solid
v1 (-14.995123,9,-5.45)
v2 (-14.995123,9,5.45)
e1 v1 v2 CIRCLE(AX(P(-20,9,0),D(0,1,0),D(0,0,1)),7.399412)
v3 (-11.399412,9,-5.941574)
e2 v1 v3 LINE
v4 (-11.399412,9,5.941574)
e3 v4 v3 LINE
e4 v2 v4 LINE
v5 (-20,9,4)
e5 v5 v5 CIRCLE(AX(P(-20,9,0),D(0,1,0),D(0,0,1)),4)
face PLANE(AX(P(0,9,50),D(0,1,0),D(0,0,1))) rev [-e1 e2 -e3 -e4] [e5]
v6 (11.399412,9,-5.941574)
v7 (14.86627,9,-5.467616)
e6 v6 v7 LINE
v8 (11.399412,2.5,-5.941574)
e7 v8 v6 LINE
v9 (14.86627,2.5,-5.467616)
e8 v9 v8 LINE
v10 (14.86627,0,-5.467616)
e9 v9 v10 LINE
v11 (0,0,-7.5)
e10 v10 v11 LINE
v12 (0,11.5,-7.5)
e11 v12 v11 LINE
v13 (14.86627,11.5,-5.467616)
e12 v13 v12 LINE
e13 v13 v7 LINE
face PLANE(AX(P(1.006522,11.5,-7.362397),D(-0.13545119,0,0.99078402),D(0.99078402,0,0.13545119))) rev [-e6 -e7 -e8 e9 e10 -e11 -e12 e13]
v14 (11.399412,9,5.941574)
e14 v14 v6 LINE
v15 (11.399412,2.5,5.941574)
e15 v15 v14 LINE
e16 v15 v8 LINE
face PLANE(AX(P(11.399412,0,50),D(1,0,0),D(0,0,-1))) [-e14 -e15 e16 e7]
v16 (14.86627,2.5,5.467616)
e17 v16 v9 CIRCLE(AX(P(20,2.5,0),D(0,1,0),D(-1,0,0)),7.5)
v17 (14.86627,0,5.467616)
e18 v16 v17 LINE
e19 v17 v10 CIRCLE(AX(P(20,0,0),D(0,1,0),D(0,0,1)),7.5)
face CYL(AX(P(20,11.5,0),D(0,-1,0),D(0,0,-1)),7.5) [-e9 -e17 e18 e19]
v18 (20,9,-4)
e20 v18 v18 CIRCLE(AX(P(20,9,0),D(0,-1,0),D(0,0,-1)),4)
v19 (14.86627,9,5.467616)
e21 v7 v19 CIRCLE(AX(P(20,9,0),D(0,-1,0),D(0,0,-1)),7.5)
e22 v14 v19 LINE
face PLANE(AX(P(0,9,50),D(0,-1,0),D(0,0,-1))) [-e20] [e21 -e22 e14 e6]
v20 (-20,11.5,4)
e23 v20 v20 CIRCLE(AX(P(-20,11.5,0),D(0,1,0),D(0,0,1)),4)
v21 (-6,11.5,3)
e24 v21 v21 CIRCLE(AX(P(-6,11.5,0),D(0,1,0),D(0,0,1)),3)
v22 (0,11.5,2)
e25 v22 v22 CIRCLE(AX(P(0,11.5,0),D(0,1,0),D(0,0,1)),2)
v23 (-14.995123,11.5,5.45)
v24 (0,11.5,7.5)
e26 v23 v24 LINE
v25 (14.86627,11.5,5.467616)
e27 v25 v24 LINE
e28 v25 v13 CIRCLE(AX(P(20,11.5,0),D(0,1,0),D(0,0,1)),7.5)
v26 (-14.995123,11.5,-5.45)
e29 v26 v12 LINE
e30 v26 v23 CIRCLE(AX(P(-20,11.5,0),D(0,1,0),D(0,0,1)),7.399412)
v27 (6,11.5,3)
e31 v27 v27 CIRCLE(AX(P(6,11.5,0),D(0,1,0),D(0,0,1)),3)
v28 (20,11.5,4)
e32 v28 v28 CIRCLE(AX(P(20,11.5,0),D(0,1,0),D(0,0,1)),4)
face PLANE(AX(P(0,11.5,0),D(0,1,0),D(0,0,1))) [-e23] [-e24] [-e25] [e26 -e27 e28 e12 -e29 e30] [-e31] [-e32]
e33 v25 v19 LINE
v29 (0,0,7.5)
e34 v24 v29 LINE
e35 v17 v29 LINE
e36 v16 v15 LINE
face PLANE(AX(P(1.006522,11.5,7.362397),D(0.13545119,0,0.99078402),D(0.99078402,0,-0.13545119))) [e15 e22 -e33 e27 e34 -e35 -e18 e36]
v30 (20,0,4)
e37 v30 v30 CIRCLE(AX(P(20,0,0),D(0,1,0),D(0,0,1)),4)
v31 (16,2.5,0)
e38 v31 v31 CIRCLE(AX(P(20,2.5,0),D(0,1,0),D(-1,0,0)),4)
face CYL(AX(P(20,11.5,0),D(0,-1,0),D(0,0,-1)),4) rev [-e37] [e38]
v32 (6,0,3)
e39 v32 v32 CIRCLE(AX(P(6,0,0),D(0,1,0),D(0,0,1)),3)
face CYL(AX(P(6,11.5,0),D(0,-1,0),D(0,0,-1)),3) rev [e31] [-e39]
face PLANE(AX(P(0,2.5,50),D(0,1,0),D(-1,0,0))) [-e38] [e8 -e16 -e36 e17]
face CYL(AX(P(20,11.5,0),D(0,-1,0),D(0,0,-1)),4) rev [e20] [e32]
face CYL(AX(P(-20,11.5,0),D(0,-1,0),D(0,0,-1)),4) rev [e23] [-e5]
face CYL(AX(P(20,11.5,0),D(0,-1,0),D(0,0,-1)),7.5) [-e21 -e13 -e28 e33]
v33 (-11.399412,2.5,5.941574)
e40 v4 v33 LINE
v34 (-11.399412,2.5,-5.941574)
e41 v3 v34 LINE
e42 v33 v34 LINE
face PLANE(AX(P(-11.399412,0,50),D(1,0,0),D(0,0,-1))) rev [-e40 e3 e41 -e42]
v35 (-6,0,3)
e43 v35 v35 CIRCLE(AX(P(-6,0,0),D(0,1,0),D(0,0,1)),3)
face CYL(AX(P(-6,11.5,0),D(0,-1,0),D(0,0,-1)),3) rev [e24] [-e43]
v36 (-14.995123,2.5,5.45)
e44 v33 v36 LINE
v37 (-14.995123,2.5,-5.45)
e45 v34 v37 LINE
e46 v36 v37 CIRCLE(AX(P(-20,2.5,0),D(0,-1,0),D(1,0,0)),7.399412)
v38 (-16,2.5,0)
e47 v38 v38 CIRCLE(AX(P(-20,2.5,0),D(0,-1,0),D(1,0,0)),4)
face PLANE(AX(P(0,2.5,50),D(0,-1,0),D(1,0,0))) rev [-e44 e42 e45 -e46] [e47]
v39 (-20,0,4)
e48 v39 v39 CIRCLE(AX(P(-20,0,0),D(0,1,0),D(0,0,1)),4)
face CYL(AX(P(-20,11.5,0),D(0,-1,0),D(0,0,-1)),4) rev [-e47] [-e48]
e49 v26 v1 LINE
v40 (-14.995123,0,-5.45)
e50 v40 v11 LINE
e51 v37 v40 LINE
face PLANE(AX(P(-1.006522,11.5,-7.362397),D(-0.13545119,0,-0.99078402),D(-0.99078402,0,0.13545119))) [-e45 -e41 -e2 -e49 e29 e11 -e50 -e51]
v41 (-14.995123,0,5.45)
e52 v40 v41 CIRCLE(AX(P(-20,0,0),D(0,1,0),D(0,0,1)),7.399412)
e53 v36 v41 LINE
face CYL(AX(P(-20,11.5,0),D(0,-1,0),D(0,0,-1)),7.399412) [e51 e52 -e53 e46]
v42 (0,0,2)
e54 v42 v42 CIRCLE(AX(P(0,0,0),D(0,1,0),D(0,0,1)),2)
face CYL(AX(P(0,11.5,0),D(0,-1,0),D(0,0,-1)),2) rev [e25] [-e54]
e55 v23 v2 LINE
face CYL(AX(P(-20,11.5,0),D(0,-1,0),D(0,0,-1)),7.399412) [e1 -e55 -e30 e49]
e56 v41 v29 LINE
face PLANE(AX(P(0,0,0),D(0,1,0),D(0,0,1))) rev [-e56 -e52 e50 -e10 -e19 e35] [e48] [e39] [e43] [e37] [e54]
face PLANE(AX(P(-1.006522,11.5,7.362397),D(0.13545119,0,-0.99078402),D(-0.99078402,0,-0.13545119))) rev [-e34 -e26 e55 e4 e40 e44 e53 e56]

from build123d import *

# Parameters (mm, degrees)
IZIM2_R                     = 4
IZIM2_R_2                   = 3
IZIM2_R_3                   = 2
Y_KSEKLIK_EKSTR_ZYON1_DEPTH = 11.5
KES_EKSTR_ZYON9_DEPTH       = 50
KES_EKSTR_ZYON9_DEPTH_BACK  = 50
IZIM16_W                    = 17.702500787
IZIM16_H                    = 6.5


with BuildPart() as part:
    # Çizim2 → Yükseklik-Ekstrüzyon1 (new body)
    with BuildSketch(Plane(origin=(0, 0, 0), x_dir=(1, 0, 0), z_dir=(0, 1, 0))):
        with BuildLine():
            Line((0, 7.5), (-14.995122872, 5.45))
            ThreePointArc((-14.995122872, 5.45), (-27.399411806, 0), (-14.995122872, -5.45))
            Line((-14.995122872, -5.45), (0, -7.5))
            Line((0, -7.5), (14.866270364, -5.46761557))
            ThreePointArc((14.866270364, -5.46761557), (27.5, 0), (14.866270364, 5.46761557))
            Line((14.866270364, 5.46761557), (0, 7.5))
        make_face()
        with Locations((-20, 0)):
            Circle(IZIM2_R, mode=Mode.SUBTRACT)
        with Locations((-6, 0)):
            Circle(IZIM2_R_2, mode=Mode.SUBTRACT)
        Circle(IZIM2_R_3, mode=Mode.SUBTRACT)
        with Locations((6, 0)):
            Circle(IZIM2_R_2, mode=Mode.SUBTRACT)
        with Locations((20, 0)):
            Circle(IZIM2_R, mode=Mode.SUBTRACT)
    extrude(amount=Y_KSEKLIK_EKSTR_ZYON1_DEPTH)

    # Çizim16 → Kes-Ekstrüzyon9 (cut, two sides: drawn at the far end of the back side and taken through both)
    with BuildSketch(Plane.XY.offset(-KES_EKSTR_ZYON9_DEPTH_BACK)):
        with Locations((-20.2506622, 5.75)):
            Rectangle(IZIM16_W, IZIM16_H)
        with Locations((20.2506622, 5.75)):
            Rectangle(IZIM16_W, IZIM16_H)
    extrude(amount=KES_EKSTR_ZYON9_DEPTH + KES_EKSTR_ZYON9_DEPTH_BACK, mode=Mode.SUBTRACT)


solid = part.part
